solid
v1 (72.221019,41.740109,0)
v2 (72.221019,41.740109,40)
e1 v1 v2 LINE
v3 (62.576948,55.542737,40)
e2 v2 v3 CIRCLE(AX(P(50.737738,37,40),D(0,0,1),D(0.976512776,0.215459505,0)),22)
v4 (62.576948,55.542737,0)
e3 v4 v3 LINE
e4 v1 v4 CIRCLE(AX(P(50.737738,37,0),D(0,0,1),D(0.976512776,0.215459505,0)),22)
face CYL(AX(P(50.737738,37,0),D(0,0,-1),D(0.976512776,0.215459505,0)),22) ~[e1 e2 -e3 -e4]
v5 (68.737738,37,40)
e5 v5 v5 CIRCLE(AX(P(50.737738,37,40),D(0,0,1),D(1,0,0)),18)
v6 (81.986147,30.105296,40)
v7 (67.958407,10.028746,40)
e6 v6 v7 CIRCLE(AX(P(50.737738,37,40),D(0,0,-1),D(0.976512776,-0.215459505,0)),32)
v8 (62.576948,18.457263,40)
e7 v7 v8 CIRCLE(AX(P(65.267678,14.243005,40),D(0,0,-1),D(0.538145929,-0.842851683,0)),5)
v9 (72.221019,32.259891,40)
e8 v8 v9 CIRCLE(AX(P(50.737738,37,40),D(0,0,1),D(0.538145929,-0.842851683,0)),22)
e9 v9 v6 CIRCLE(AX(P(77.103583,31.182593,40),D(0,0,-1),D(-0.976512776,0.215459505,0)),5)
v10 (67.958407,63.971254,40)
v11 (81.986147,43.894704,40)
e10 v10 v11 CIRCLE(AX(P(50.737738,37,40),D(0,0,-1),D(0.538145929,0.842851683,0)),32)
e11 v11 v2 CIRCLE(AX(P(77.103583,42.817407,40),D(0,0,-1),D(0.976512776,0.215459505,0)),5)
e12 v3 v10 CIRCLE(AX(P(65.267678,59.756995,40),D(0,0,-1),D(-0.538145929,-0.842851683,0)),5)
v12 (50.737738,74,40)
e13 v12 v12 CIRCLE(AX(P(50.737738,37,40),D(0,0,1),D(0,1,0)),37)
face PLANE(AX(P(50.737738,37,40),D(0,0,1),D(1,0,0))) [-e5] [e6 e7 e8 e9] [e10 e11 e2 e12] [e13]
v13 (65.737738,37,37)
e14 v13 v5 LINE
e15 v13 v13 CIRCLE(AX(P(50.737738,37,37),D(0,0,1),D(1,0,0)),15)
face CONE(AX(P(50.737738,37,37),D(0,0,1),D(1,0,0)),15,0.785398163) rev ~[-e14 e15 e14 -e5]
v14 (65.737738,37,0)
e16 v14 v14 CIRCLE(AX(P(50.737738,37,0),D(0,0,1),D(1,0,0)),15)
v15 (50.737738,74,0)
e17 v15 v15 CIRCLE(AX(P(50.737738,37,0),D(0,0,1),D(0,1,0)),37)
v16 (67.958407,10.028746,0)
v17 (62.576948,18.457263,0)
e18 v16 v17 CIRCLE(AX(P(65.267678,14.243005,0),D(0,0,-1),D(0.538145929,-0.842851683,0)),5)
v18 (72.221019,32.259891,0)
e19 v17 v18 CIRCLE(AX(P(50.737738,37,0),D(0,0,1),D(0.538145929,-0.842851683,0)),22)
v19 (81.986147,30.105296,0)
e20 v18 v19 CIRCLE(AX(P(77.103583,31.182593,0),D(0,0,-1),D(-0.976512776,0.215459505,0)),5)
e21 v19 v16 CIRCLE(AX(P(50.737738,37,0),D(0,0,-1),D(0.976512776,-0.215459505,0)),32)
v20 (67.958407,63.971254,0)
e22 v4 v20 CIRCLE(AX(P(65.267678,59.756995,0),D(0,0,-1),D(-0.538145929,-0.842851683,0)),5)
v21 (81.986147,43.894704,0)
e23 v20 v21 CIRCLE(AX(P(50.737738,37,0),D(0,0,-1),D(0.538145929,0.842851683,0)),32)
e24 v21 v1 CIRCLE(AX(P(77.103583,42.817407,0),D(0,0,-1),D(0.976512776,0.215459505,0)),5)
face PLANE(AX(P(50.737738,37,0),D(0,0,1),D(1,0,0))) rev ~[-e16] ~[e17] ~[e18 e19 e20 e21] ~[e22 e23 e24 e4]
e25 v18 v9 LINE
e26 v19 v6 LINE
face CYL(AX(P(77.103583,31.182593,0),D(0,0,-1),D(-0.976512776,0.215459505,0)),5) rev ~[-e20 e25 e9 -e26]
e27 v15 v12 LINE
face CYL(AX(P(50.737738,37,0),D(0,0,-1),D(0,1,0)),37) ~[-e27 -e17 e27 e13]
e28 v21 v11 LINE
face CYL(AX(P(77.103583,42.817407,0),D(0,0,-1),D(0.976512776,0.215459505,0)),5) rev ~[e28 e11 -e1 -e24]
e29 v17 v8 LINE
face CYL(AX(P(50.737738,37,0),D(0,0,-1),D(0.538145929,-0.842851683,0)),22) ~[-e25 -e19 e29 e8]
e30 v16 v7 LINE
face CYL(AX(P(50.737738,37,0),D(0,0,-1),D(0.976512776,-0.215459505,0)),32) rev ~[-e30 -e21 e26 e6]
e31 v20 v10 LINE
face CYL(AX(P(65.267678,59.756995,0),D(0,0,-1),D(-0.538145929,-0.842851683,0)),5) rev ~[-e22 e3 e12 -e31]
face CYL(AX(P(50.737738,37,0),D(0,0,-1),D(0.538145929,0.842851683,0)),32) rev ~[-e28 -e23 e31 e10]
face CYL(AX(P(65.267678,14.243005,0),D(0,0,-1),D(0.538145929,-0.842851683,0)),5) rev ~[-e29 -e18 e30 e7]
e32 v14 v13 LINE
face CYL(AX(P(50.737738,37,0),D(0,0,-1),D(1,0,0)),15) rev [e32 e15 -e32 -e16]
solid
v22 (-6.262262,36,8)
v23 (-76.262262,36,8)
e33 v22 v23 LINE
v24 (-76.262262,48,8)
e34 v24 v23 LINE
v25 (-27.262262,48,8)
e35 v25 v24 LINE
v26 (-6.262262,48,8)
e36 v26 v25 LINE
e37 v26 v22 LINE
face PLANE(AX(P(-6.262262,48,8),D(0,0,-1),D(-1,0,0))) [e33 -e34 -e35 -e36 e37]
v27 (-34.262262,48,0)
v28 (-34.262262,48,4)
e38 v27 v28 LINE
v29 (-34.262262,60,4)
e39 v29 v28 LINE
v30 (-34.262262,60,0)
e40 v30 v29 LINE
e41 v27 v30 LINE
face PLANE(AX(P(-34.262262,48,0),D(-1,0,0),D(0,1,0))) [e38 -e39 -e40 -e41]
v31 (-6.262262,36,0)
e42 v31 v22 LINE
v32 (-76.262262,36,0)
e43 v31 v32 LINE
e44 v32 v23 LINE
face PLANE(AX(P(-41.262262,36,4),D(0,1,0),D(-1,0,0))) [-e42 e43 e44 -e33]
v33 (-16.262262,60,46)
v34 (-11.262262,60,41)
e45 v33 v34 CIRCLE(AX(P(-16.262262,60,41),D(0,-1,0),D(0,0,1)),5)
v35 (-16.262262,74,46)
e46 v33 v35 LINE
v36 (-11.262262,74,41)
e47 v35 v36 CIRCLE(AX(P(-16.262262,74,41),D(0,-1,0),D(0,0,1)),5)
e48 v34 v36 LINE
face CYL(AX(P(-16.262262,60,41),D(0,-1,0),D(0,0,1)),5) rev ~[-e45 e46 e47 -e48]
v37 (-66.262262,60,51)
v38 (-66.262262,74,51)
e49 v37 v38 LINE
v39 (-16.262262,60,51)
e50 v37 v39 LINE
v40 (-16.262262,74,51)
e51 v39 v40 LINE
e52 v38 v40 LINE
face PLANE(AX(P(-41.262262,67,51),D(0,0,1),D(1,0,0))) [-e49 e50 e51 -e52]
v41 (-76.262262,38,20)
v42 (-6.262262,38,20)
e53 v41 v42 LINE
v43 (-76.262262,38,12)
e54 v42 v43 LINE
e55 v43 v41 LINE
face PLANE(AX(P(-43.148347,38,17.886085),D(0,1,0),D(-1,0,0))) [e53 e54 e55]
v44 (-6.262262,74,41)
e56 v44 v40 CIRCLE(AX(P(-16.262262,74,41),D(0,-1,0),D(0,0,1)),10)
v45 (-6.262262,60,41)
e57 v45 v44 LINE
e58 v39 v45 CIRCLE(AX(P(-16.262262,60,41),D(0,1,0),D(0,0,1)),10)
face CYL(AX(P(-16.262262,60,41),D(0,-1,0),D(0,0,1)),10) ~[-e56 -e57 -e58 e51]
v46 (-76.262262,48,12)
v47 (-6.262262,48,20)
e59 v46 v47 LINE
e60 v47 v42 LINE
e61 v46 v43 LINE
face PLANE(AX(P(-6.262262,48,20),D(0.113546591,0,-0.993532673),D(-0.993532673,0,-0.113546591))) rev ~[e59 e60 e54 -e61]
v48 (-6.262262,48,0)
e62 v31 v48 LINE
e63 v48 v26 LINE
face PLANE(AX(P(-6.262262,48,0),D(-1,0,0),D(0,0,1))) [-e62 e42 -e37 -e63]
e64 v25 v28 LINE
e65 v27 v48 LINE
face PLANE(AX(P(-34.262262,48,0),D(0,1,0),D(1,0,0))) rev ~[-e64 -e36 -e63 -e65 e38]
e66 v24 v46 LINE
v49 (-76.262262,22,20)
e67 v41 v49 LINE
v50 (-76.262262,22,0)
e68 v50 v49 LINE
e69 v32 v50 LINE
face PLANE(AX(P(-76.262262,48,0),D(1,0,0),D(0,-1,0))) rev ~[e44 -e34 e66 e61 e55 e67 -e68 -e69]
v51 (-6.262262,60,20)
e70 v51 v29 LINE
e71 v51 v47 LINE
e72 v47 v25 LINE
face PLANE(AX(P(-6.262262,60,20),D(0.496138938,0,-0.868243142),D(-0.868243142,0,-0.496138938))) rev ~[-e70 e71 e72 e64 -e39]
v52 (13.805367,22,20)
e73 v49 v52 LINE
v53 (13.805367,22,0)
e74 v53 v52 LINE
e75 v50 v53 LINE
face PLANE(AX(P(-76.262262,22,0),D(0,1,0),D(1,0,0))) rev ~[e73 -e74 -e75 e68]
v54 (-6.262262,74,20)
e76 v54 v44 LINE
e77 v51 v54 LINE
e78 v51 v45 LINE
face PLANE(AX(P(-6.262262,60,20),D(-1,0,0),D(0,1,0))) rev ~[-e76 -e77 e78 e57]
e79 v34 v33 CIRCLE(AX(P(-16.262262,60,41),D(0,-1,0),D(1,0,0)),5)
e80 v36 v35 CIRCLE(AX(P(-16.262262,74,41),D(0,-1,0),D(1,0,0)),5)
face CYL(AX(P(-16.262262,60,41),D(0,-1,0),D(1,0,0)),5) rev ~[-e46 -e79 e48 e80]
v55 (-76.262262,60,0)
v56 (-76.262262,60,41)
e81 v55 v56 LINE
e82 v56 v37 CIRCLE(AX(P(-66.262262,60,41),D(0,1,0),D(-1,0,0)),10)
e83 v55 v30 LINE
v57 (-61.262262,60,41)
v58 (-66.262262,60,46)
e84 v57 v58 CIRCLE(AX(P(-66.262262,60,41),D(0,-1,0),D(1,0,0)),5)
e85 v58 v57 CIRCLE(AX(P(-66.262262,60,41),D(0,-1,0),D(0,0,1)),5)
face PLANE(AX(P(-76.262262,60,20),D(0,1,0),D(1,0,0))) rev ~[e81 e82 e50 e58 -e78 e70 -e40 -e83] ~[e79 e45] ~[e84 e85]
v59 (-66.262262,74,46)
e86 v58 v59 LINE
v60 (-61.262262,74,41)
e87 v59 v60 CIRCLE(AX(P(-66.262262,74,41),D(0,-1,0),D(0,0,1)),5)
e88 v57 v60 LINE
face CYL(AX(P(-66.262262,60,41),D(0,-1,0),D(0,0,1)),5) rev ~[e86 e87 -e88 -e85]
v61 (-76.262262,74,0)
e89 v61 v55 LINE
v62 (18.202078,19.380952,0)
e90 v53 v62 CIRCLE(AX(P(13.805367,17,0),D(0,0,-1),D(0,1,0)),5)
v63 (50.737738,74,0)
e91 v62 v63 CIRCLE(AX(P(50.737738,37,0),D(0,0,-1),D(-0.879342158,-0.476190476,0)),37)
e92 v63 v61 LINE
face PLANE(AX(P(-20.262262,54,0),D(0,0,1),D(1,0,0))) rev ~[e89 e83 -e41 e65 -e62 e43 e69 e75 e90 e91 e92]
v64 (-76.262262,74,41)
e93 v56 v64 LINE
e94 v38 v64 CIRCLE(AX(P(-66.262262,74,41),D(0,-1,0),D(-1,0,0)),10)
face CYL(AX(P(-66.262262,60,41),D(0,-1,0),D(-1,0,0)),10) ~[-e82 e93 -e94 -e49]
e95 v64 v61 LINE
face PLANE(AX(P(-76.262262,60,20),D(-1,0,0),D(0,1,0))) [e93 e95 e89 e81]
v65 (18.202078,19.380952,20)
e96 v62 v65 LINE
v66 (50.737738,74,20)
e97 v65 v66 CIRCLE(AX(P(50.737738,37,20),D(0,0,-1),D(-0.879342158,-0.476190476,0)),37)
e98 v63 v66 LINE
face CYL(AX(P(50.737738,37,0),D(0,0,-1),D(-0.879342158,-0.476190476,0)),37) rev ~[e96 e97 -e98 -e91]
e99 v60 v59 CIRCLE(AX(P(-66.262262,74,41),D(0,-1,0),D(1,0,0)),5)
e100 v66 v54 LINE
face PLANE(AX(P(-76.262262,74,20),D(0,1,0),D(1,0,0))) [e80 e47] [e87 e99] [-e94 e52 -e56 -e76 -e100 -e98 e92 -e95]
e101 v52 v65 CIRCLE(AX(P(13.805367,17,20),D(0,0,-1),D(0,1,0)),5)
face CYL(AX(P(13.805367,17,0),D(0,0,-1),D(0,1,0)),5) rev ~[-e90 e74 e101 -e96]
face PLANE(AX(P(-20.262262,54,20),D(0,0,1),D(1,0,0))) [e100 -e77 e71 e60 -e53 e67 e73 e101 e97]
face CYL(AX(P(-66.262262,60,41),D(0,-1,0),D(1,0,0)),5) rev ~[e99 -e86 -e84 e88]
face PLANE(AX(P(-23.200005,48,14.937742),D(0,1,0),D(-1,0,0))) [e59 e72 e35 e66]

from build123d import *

# Parameters (mm, degrees)
F0_R         = 15
F1_DEPTH     = 40
F2_DEPTH     = 20
F4_DEPTH     = 10
F3_W         = 70
F3_H         = 8
F5_DEPTH     = 12
F6_W         = 70
F6_H         = 14
F7_DEPTH     = 31
F9_DEPTH     = 14.001
F0_W         = 28
F0_H         = 12
F10_DEPTH    = 20
F11_T1_DEPTH = 12
F12_SIZE     = 3


# Not quite as in the source:
# - a fillet or chamfer that OpenCascade refuses, or shapes differently, is made with other operations: its cross-section is extruded or revolved along the edge and cut away or added
# - a feature names something its author has since deleted; it is built from what else it names


with BuildPart() as f1:
    # F0 (on Top) → F1 (new body)
    with BuildSketch(Plane.XY):
        with BuildLine():
            ThreePointArc((18.202077895, 19.380952381), (59.8256579019, 1.1334458447), (87.7377377315, 37))
            ThreePointArc((87.7377377315, 37), (76.9006886354, 63.1629509039), (50.7377377315, 74))
            ThreePointArc((50.7377377315, 74), (18.9501240911, 55.9353536816), (18.202077895, 19.380952381))
        make_face()
        with BuildLine():
            ThreePointArc((81.9861465659, 30.1052958497), (76.9690140278, 18.6718756042), (67.9584074606, 10.028746153))
            ThreePointArc((67.9584074606, 10.028746153), (61.0534194019, 11.5522749214), (62.5769481703, 18.4572629802))
            ThreePointArc((62.5769481703, 18.4572629802), (28.7377377315, 37), (62.5769481703, 55.5427370198))
            ThreePointArc((62.5769481703, 55.5427370198), (61.0534194019, 62.4477250786), (67.9584074606, 63.971253847))
            ThreePointArc((67.9584074606, 63.971253847), (76.9690140278, 55.3281243958), (81.9861465659, 43.8947041503))
            ThreePointArc((81.9861465659, 43.8947041503), (78.180880209, 37.9348427464), (72.2210188051, 41.7401091033))
            ThreePointArc((72.2210188051, 41.7401091033), (72.6081764973, 39.3840948366), (72.7377377315, 37))
            ThreePointArc((72.7377377315, 37), (72.6081764973, 34.6159051634), (72.2210188051, 32.2598908967))
            ThreePointArc((72.2210188051, 32.2598908967), (78.180880209, 36.0651572536), (81.9861465659, 30.1052958497))
        make_face(mode=Mode.SUBTRACT)
        with BuildLine():
            ThreePointArc((62.5769481703, 55.5427370198), (28.7377377315, 37), (62.5769481703, 18.4572629802))
            ThreePointArc((62.5769481703, 18.4572629802), (68.7717401852, 24.3994144779), (72.2210188051, 32.2598908967))
            ThreePointArc((72.2210188051, 32.2598908967), (72.6081764973, 34.6159051634), (72.7377377315, 37))
            ThreePointArc((72.7377377315, 37), (72.6081764973, 39.3840948366), (72.2210188051, 41.7401091033))
            ThreePointArc((72.2210188051, 41.7401091033), (68.7717401852, 49.6005855221), (62.5769481703, 55.5427370198))
        make_face()
        with Locations((50.7377377315, 37)):
            Circle(F0_R, mode=Mode.SUBTRACT)
    extrude(amount=F1_DEPTH)

    # F12
    f12_edges = [f1.edges().sort_by_distance(p)[0] for p in [
        (35.737738, 37, 40),
    ]]
    chamfer(f12_edges, length=F12_SIZE)


with BuildPart() as f2:
    # F0 (on Top) → F2 (new body)
    with BuildSketch(Plane.XY):
        with BuildLine():
            ThreePointArc((18.202077895, 19.380952381), (18.9501240911, 55.9353536816), (50.7377377315, 74))
            Line((50.7377377315, 74), (-6.2622622685, 74))
            Line((-6.2622622685, 74), (-6.2622622685, 60))
            Line((-6.2622622685, 60), (-6.2622622685, 48))
            Line((-6.2622622685, 48), (-6.2622622685, 36))
            Line((-6.2622622685, 36), (-6.2622622685, 22))
            Line((-6.2622622685, 22), (13.8053671063, 22))
            ThreePointArc((13.8053671063, 22), (16.3641986849, 21.2956234649), (18.202077895, 19.380952381))
        make_face()
        Polygon((-12.395917438, 22), (-6.2622622685, 22), (-6.2622622685, 36), (-76.2622622685, 36), (-76.2622622685, 22), align=None)
        Polygon((-6.2622622685, 36), (-6.2622622685, 48), (-34.2622622685, 48), (-76.2622622685, 48), (-76.2622622685, 36), align=None)
        Polygon((-6.2622622685, 60), (-6.2622622685, 74), (-76.2622622685, 74), (-76.2622622685, 60), (-34.2622622685, 60), align=None)
    extrude(amount=F2_DEPTH)

    # F3 (on face) → F4 (cut)
    with BuildSketch(Plane(origin=(0, 48, 0), x_dir=(-1, 0, 0), z_dir=(0, 1, 0))):
        Polygon((76.2622622685, 12), (76.2622622685, 20), (6.2622622685, 20), align=None)
    extrude(amount=-F4_DEPTH, mode=Mode.SUBTRACT)

    # F3 (on face) → F5 (cut)
    with BuildSketch(Plane(origin=(0, 48, 0), x_dir=(-1, 0, 0), z_dir=(0, 1, 0))):
        with Locations((41.2622622685, 4)):
            Rectangle(F3_W, F3_H)
    extrude(amount=-F5_DEPTH, mode=Mode.SUBTRACT)

    # F6 (on face) → F7 (join)
    with BuildSketch(Plane.XY.offset(20)):
        with Locations((-41.2622622685, 67)):
            Rectangle(F6_W, F6_H)
    extrude(amount=F7_DEPTH)

    # F8 (on face) → F9 (cut, through all)
    with BuildSketch(Plane.XZ.offset(-60)):
        with BuildLine():
            ThreePointArc((-61.2622622685, 41), (-62.7267283626, 44.5355339059), (-66.2622622685, 46))
            ThreePointArc((-66.2622622685, 46), (-69.7977961744, 37.4644660941), (-61.2622622685, 41))
        make_face()
        with BuildLine():
            ThreePointArc((-76.2622622685, 41), (-73.3333300804, 48.0710678119), (-66.2622622685, 51))
            Line((-66.2622622685, 51), (-76.2622622685, 51))
            Line((-76.2622622685, 51), (-76.2622622685, 41))
        make_face()
        with BuildLine():
            Line((-6.2622622685, 41), (-6.2622622685, 51))
            Line((-6.2622622685, 51), (-16.2622622685, 51))
            ThreePointArc((-16.2622622685, 51), (-9.1911944566, 48.0710678119), (-6.2622622685, 41))
        make_face()
        with BuildLine():
            ThreePointArc((-11.2622622685, 41), (-12.7267283626, 44.5355339059), (-16.2622622685, 46))
            ThreePointArc((-16.2622622685, 46), (-19.7977961744, 37.4644660941), (-11.2622622685, 41))
        make_face()
    extrude(amount=-F9_DEPTH, mode=Mode.SUBTRACT)

    # F0 (on Top) → F10 (join)
    with BuildSketch(Plane.XY):
        with Locations((-20.2622622685, 54)):
            Rectangle(F0_W, F0_H)
    extrude(amount=F10_DEPTH)

    # F11: chamfer of 28 x 16 on 1 edges, made by hand

    # F11_s2 → F11_t1 (cut)
    with BuildSketch(Plane.XZ.offset(-60)):
        Polygon((-6.2622622685, 20), (-34.2622622685, 4), (-34.2622622685, 20), align=None)
    extrude(amount=F11_T1_DEPTH, mode=Mode.SUBTRACT)


solid = Compound([f1.part, f2.part])
